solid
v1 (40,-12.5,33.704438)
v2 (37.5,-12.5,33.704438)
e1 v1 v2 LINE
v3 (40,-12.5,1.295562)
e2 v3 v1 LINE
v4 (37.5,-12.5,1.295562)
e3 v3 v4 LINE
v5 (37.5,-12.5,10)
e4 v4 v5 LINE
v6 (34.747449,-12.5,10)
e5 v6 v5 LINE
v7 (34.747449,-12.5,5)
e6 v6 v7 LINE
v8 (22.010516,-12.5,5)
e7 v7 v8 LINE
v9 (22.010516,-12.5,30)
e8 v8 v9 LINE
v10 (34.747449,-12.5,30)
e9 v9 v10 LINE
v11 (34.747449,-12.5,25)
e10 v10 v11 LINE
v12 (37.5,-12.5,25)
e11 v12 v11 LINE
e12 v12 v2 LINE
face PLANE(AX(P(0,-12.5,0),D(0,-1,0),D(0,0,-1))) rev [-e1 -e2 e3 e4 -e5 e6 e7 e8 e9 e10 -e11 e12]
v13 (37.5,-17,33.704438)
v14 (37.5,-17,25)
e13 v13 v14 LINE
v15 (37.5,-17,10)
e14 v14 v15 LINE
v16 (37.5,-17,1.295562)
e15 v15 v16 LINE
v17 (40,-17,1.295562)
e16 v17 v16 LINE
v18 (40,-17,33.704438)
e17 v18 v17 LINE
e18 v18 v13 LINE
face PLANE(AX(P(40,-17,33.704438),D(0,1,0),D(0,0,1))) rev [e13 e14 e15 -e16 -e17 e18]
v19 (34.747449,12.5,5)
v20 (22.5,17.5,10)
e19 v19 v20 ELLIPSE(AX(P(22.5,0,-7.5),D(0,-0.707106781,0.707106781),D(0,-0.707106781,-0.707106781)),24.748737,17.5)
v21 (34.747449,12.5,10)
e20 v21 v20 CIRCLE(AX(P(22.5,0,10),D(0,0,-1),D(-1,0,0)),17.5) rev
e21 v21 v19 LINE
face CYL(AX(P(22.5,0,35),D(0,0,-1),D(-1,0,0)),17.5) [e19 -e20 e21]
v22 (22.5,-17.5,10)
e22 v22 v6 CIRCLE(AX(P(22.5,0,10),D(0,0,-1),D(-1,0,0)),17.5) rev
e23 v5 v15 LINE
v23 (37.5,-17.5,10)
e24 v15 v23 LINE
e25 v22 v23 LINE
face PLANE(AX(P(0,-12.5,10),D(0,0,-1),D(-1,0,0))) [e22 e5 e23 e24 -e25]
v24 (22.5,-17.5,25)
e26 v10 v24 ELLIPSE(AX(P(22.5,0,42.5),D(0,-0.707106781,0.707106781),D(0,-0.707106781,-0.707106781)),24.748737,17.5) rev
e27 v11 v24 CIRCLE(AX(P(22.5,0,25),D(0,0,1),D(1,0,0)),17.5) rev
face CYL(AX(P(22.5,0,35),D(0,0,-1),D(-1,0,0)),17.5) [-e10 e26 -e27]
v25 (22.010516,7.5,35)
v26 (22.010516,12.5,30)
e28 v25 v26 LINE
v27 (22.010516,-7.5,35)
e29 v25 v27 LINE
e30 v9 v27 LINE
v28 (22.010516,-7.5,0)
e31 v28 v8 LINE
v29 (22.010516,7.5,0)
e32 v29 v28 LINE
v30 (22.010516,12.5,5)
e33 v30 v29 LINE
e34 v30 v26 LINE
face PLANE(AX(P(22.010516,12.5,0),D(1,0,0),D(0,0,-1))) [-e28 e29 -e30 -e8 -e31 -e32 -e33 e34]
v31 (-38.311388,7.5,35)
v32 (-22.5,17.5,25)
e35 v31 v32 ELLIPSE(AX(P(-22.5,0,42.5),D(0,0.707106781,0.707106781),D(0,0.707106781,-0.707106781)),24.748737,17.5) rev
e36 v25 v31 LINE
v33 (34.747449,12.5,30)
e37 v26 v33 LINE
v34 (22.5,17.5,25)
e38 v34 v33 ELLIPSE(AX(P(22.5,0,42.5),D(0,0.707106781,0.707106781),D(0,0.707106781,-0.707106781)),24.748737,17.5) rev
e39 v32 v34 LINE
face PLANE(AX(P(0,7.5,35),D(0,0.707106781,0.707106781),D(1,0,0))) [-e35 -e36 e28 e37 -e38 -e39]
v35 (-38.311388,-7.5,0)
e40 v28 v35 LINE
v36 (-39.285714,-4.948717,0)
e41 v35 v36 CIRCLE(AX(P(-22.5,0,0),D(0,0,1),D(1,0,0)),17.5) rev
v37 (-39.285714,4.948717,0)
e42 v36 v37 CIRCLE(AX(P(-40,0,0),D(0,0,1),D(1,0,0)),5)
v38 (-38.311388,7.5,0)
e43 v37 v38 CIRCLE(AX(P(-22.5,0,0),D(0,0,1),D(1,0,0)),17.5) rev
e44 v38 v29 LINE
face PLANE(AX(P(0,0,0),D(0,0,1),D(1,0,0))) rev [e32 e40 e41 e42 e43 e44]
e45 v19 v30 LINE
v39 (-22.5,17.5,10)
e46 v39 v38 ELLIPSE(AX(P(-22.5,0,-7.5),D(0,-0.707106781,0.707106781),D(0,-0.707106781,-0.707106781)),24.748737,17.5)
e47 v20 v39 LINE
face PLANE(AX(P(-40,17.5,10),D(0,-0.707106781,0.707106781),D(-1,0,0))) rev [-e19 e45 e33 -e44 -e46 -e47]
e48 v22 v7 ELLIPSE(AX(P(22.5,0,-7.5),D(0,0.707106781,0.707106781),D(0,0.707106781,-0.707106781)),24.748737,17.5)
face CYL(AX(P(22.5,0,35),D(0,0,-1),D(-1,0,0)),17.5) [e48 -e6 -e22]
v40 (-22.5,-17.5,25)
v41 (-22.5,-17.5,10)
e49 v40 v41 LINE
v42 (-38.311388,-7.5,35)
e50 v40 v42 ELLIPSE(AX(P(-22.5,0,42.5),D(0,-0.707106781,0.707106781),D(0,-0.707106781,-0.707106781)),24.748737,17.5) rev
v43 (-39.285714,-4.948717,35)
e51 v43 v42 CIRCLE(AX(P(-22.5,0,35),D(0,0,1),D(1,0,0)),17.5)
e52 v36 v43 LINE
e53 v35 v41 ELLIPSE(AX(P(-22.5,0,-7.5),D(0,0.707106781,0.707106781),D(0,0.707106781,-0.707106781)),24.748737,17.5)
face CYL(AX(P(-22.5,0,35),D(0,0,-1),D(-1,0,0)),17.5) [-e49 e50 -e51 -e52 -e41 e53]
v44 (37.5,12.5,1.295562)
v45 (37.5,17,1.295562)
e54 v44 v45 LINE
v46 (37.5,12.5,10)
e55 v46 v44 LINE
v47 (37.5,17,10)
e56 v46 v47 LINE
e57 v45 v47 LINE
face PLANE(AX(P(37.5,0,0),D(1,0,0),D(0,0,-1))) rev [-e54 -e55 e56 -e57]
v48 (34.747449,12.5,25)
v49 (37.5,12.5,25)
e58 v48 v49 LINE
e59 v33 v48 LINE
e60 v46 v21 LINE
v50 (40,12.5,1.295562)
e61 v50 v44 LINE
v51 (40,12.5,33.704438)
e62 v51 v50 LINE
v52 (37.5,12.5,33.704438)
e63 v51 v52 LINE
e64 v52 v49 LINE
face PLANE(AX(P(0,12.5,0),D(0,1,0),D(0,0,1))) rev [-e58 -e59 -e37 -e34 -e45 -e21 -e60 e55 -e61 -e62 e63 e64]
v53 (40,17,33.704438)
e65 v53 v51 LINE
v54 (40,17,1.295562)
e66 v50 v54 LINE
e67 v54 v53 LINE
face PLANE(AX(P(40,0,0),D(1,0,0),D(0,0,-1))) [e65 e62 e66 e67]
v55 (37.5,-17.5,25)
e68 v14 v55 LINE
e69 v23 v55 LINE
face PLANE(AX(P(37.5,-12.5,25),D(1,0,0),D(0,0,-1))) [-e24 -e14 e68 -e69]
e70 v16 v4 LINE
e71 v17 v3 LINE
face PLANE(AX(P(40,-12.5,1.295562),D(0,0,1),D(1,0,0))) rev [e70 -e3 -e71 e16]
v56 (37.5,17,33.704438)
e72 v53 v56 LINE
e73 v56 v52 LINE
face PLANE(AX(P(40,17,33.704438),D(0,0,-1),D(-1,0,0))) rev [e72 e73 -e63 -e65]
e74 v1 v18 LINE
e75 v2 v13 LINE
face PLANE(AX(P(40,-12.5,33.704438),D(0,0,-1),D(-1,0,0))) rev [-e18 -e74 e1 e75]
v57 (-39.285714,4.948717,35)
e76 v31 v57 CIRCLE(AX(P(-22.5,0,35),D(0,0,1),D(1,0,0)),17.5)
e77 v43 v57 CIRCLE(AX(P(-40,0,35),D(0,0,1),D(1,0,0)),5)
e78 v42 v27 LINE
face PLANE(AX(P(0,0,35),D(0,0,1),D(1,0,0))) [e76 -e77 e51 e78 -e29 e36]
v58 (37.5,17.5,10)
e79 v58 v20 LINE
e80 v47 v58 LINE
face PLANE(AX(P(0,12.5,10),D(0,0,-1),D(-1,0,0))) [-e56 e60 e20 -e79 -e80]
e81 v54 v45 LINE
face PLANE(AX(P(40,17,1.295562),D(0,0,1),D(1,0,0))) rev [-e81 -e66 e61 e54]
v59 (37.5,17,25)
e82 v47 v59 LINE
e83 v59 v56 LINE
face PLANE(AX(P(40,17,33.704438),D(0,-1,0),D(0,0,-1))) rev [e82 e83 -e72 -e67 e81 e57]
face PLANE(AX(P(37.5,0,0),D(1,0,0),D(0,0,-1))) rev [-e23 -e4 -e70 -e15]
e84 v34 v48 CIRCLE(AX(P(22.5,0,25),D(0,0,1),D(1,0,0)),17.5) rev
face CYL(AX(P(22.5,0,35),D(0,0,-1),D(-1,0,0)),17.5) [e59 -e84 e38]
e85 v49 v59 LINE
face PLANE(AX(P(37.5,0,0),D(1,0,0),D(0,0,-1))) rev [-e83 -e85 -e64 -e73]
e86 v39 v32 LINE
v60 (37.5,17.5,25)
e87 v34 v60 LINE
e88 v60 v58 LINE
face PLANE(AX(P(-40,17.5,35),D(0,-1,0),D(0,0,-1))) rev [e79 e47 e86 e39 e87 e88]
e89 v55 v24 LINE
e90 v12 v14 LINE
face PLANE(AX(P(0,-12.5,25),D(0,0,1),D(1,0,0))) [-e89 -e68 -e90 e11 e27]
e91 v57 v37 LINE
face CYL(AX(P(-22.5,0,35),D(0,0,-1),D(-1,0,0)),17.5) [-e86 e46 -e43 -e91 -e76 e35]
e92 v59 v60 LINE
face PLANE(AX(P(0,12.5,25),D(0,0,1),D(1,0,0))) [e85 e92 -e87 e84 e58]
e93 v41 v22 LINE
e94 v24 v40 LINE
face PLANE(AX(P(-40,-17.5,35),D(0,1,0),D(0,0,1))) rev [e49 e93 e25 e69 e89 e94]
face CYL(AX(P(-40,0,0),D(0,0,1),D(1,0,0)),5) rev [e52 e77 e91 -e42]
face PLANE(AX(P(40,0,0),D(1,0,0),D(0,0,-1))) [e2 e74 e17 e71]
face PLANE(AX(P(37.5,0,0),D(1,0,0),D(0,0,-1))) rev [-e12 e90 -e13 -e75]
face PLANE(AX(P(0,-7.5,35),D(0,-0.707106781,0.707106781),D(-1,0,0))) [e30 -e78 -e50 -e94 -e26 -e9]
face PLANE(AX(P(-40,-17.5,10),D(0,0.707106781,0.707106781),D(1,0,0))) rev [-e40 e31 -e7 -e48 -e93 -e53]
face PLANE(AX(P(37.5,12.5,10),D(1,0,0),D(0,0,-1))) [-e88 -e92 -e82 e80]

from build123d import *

# Parameters (mm, degrees)
IZIM1_W                     = 80
IZIM1_H                     = 35
Y_KSEKLIK_EKSTR_ZYON1_DEPTH = 35
RADYUS1_R                   = 17.5
RADYUS2_R                   = 17.5
RADYUS3_R                   = 17.5
IZIM2_R                     = 5
KES_EKSTR_ZYON1_DEPTH       = 56.957573214
PAH1_SIZE                   = 10
IZIM3_W                     = 37.5
IZIM3_H                     = 15
Y_KSEKLIK_EKSTR_ZYON2_DEPTH = 5
IZIM4_W                     = 37.5
IZIM4_H                     = 15
Y_KSEKLIK_EKSTR_ZYON3_DEPTH = 5
IZIM6_W                     = 17.989484019
IZIM6_H                     = 35
KES_EKSTR_ZYON2_DEPTH       = 25
IZIM7_W                     = 32.408876432
IZIM7_H                     = 4.5
Y_KSEKLIK_EKSTR_ZYON4_DEPTH = 2.5


# Some blends are built 0.0001 mm under size
with BuildPart() as part:
    # Çizim1 → Yükseklik-Ekstrüzyon1 (new body)
    with BuildSketch(Plane.XY):
        Rectangle(IZIM1_W, IZIM1_H)
    extrude(amount=Y_KSEKLIK_EKSTR_ZYON1_DEPTH)

    # Radyus1
    radyus1_edges = [part.edges().sort_by_distance(p)[0] for p in [
        (-40, 17.5, 17.5),
    ]]
    fillet(radyus1_edges, radius=RADYUS1_R)

    # Radyus2
    radyus2_edges = [part.edges().sort_by_distance(p)[0] for p in [
        (-40, -17.5, 17.5),
    ]]
    fillet(radyus2_edges, radius=RADYUS2_R - 0.0001)  # a hair under: the kernel refuses the full size

    # Radyus3
    radyus3_edges = [part.edges().sort_by_distance(p)[0] for p in [
        (40, -17.5, 17.5),
        (40, 17.5, 17.5),
    ]]
    fillet(radyus3_edges, radius=RADYUS3_R - 0.0001)  # a hair under: the kernel refuses the full size

    # Çizim2 → Kes-Ekstrüzyon1 (cut, through all)
    with BuildSketch(Plane.XY.offset(35)):
        with Locations((-40, 0)):
            Circle(IZIM2_R)
    extrude(amount=-KES_EKSTR_ZYON1_DEPTH, mode=Mode.SUBTRACT)

    # Pah1
    # the kernel refuses this chamfer: 10 mm, written as the material it takes off along each edge
    with BuildSketch(Plane(origin=(48.21692988, -17.5, 0), x_dir=(0, 0.9996219169112968, -0.027495876610586372), z_dir=(-1, 0, 0))) as pah1_piece_1:
        Polygon((PAH1_SIZE * 0.999621916911, -PAH1_SIZE * 0.0274958766106), (-PAH1_SIZE * 0.0274958766106, -PAH1_SIZE * 0.999621916911), (0, 0), align=None)
    extrude(amount=96.433859759, mode=Mode.SUBTRACT)
    with BuildSketch(Plane(origin=(48.21692988, -17.5, 35), x_dir=(0, 0.9996219169112968, 0.027495876610586317), z_dir=(-1, 0, 0))) as pah1_piece_2:
        Polygon((PAH1_SIZE * 0.999621916911, PAH1_SIZE * 0.0274958766106), (-PAH1_SIZE * 0.0274958766106, PAH1_SIZE * 0.999621916911), (0, 0), align=None)
    extrude(amount=96.433859759, mode=Mode.SUBTRACT)
    with BuildSketch(Plane(origin=(-48.21682988, 17.5, 0), x_dir=(0, -0.9996219169112968, -0.027495876610586372), z_dir=(1, 0, 0))) as pah1_piece_3:
        Polygon((PAH1_SIZE * 0.999621916911, -PAH1_SIZE * 0.0274958766106), (-PAH1_SIZE * 0.0274958766106, -PAH1_SIZE * 0.999621916911), (0, 0), align=None)
    extrude(amount=96.433759759, mode=Mode.SUBTRACT)
    with BuildSketch(Plane(origin=(-48.21682988, 17.5, 35), x_dir=(0, -0.9996219169112968, 0.027495876610586317), z_dir=(1, 0, 0))) as pah1_piece_4:
        Polygon((PAH1_SIZE * 0.999621916911, PAH1_SIZE * 0.0274958766106), (-PAH1_SIZE * 0.0274958766106, PAH1_SIZE * 0.999621916911), (0, 0), align=None)
    extrude(amount=96.433759759, mode=Mode.SUBTRACT)

    # Çizim3 → Yükseklik-Ekstrüzyon2 (add)
    with BuildSketch(Plane(origin=(0, 17.5, 0), x_dir=(1, 0, 0), z_dir=(0, 1, 0))):
        with Locations((18.75, -17.5)):
            Rectangle(IZIM3_W, IZIM3_H)
    extrude(amount=-Y_KSEKLIK_EKSTR_ZYON2_DEPTH)

    # Çizim4 → Yükseklik-Ekstrüzyon3 (add)
    with BuildSketch(Plane.XZ.offset(17.5)):
        with Locations((18.75, 17.5)):
            Rectangle(IZIM4_W, IZIM4_H)
    extrude(amount=-Y_KSEKLIK_EKSTR_ZYON3_DEPTH)

    # Çizim6 → Kes-Ekstrüzyon2 (cut)
    with BuildSketch(Plane(origin=(0, -12.5, 0), x_dir=(1, 0, 0), z_dir=(0, 1, 0))):
        with Locations((31.00525799, -17.5)):
            Rectangle(IZIM6_W, IZIM6_H)
    extrude(amount=KES_EKSTR_ZYON2_DEPTH, mode=Mode.SUBTRACT)

    # Çizim7 → Yükseklik-Ekstrüzyon4 (add)
    with BuildSketch(Plane(origin=(37.5, 0, 0), x_dir=(0, 0, -1), z_dir=(1, 0, 0))):
        with Locations((-17.5, 14.75)):
            Rectangle(IZIM7_W, IZIM7_H)
        with Locations((-17.5, -14.75)):
            Rectangle(IZIM7_W, IZIM7_H)
    extrude(amount=Y_KSEKLIK_EKSTR_ZYON4_DEPTH)


solid = part.part
